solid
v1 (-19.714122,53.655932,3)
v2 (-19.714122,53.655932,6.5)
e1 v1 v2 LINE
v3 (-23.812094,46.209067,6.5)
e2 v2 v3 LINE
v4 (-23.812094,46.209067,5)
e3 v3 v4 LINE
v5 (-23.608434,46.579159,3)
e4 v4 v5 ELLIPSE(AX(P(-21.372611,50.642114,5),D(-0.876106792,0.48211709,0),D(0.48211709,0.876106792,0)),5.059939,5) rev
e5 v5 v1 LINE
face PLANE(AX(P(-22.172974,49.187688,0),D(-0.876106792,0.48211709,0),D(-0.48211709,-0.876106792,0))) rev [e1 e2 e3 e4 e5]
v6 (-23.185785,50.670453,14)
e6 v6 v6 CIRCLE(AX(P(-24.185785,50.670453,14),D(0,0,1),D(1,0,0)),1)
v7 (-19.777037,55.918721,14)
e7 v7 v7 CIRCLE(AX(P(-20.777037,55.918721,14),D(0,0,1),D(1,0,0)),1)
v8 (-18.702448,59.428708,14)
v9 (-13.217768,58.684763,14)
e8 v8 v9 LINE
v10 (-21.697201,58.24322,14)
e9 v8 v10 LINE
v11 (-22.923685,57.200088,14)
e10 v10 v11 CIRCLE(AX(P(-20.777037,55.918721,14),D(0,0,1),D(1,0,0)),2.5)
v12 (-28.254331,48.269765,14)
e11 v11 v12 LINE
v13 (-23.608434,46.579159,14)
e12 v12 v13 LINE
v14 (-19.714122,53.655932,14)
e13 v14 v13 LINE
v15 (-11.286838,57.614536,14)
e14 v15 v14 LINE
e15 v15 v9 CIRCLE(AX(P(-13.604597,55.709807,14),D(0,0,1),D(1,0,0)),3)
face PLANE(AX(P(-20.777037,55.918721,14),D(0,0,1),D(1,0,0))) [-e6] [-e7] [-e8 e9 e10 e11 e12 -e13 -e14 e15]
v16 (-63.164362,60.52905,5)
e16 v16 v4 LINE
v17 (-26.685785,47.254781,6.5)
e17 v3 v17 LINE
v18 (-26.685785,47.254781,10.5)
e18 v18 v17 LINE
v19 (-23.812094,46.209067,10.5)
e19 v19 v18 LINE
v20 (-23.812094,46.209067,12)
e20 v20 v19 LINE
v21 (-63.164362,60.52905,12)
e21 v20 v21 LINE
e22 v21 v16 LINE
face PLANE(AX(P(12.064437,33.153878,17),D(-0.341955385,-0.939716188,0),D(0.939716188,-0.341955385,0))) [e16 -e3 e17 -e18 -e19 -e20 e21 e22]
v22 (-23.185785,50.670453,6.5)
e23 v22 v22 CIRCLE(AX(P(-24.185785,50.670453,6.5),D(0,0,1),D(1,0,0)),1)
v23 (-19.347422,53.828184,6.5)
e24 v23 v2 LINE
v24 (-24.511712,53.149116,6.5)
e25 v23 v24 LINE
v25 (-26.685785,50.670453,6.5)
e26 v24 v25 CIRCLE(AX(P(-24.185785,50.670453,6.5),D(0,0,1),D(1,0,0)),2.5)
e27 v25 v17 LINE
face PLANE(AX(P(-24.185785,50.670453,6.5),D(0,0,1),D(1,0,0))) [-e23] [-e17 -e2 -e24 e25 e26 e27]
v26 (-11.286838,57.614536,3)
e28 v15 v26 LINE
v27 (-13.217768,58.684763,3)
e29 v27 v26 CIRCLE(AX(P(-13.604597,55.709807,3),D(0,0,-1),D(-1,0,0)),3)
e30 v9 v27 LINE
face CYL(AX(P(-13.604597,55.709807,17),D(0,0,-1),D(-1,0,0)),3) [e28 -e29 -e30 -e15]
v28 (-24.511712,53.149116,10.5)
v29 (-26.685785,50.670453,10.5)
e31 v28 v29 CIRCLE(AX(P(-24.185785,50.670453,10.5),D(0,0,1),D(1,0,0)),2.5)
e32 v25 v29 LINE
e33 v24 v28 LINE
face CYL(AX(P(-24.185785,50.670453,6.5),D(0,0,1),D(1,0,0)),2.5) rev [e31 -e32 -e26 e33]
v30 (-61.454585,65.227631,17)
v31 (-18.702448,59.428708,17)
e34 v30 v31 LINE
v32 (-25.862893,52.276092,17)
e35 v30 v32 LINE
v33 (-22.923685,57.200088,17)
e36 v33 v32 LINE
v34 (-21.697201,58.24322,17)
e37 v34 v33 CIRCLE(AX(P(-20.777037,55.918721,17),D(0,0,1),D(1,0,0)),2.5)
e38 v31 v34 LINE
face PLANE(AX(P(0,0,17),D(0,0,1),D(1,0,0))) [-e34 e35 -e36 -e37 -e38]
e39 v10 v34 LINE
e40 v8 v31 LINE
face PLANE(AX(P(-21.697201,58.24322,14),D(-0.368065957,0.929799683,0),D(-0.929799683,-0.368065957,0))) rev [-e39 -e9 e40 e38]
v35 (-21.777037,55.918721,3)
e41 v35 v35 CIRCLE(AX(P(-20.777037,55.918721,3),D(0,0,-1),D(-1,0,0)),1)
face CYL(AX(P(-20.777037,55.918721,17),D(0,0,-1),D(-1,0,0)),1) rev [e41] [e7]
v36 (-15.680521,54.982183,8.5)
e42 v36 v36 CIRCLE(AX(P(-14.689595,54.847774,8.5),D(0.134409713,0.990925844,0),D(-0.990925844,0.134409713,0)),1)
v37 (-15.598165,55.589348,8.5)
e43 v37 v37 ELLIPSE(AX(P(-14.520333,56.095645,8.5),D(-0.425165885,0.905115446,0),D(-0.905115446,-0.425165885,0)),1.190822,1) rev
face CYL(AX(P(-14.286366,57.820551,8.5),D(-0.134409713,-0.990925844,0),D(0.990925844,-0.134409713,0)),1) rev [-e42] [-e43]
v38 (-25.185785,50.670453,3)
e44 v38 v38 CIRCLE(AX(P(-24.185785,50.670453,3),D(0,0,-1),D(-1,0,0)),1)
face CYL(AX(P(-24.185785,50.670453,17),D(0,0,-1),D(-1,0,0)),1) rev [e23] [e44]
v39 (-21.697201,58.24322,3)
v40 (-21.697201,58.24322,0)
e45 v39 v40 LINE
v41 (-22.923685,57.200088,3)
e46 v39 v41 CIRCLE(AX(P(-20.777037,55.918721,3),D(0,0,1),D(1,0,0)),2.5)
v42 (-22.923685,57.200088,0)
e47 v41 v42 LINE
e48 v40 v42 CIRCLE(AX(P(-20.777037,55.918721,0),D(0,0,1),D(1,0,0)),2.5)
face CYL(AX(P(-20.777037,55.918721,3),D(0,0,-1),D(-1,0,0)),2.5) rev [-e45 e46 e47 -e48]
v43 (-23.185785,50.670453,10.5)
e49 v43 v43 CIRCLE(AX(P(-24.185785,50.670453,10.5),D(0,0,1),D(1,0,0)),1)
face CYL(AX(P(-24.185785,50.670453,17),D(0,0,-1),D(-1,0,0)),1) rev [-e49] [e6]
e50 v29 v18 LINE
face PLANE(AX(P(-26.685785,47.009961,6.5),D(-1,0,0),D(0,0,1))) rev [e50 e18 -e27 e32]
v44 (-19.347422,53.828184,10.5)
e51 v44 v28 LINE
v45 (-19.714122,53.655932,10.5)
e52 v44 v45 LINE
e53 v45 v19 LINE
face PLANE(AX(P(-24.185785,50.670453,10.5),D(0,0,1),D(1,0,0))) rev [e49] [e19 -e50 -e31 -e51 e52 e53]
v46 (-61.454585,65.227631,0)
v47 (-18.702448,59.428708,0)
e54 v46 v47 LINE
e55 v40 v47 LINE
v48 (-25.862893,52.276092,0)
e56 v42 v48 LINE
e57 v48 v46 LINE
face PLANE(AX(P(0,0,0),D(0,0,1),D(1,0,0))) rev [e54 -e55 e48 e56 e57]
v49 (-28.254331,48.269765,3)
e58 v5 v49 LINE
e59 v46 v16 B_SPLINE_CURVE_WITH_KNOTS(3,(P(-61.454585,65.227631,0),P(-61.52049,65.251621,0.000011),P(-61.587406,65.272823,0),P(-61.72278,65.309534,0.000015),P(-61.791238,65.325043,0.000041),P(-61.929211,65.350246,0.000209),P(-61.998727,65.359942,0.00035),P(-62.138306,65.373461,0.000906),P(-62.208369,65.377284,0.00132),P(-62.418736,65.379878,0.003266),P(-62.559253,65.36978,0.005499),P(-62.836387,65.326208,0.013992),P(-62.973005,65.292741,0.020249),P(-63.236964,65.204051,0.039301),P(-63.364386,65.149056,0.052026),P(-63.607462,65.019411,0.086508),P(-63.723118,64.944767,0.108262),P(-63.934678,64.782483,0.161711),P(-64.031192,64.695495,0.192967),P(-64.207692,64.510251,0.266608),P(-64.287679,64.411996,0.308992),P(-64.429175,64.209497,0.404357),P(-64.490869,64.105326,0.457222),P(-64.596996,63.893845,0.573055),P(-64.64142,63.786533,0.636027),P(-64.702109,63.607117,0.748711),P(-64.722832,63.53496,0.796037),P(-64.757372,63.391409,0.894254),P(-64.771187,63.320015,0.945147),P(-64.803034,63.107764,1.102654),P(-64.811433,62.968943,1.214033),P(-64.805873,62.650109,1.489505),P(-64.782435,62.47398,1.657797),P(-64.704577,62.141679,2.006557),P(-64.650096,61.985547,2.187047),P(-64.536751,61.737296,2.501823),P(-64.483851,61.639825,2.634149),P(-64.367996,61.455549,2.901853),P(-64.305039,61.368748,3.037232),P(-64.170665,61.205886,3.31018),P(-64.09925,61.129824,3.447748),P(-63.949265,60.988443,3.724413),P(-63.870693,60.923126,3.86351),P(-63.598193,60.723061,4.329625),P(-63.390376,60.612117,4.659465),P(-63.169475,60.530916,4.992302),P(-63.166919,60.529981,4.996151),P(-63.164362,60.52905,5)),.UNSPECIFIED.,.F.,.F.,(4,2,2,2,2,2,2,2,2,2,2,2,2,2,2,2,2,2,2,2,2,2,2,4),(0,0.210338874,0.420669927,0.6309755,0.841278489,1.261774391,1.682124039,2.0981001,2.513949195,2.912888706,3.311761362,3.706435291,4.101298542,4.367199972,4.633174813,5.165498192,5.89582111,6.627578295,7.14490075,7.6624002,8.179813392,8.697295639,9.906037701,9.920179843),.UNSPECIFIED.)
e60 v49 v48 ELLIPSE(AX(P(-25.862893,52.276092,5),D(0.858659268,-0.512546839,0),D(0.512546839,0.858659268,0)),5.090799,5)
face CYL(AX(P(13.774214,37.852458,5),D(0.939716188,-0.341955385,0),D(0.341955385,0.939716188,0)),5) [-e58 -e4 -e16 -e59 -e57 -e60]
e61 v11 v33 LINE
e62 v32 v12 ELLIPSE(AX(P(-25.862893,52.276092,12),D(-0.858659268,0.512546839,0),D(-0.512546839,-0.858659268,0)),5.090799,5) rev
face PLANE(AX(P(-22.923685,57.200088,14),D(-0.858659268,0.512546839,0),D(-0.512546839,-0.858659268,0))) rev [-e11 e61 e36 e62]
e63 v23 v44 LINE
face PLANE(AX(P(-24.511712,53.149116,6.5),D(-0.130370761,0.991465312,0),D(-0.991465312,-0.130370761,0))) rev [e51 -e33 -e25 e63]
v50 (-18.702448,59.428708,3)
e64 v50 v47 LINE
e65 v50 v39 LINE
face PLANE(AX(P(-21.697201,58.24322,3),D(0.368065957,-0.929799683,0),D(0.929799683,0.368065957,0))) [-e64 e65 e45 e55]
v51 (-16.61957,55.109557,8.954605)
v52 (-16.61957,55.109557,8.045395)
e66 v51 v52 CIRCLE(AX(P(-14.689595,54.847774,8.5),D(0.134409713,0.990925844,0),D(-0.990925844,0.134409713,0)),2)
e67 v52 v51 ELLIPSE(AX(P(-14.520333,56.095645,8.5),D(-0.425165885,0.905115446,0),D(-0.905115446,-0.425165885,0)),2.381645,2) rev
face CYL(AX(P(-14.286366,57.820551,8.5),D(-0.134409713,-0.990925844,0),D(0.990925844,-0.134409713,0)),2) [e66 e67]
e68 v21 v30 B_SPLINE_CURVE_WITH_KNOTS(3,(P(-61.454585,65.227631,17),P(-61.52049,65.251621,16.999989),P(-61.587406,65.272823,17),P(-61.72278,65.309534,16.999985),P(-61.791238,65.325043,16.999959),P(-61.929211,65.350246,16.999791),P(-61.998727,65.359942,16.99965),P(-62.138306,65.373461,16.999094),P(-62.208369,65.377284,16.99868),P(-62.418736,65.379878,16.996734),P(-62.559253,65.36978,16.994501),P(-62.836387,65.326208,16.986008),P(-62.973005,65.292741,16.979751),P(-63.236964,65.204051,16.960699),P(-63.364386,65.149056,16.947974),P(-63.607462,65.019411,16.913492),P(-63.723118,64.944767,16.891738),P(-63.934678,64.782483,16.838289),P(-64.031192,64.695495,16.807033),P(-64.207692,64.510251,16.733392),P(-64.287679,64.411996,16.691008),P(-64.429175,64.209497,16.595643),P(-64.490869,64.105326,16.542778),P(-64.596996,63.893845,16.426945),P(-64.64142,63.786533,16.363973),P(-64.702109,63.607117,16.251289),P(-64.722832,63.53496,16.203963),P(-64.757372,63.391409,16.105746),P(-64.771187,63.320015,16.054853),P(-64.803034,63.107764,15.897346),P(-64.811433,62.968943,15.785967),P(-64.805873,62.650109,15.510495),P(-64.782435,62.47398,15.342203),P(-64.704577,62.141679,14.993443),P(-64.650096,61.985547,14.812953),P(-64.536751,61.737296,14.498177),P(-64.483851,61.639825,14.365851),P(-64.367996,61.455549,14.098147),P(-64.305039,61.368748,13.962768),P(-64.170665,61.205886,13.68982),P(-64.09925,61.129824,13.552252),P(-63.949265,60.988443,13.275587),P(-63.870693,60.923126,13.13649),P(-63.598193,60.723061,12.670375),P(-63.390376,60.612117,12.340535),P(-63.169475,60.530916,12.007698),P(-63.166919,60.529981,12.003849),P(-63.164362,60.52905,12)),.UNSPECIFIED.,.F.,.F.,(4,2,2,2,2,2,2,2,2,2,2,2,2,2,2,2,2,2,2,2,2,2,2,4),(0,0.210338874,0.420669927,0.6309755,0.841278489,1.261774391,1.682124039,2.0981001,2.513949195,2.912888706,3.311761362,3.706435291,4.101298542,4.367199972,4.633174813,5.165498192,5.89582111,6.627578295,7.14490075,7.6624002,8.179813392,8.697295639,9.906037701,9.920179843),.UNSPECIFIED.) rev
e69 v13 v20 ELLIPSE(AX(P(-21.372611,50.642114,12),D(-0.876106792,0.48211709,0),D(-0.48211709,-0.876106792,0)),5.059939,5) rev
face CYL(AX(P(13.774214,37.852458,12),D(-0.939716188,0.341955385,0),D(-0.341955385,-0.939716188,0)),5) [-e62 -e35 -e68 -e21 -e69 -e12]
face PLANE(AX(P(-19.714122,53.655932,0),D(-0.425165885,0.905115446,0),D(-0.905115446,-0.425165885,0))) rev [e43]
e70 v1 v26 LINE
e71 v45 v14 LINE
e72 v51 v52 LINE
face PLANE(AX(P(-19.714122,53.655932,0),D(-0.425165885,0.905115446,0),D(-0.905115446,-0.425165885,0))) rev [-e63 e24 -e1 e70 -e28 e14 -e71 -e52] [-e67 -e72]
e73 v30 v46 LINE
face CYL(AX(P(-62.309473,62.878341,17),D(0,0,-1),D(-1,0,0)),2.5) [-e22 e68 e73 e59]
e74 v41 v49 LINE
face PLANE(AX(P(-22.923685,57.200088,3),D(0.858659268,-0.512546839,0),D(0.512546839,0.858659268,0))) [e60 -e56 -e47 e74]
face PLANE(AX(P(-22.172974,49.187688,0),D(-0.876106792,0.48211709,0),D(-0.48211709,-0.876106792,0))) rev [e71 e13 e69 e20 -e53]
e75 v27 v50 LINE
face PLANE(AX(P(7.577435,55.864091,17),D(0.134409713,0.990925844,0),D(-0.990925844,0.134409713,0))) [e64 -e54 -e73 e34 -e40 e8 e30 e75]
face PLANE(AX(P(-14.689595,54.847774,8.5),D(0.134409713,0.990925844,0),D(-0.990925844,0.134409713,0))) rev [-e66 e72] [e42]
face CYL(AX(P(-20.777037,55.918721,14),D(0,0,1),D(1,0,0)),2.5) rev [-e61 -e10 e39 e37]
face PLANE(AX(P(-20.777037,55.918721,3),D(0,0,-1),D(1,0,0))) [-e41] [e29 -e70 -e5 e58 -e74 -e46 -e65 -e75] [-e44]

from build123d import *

# Parameters (mm, degrees)
SKETCH1_R           = 1
BOSS_EXTRUDE1_DEPTH = 17
CUT_EXTRUDE1_DEPTH  = 2
CUT_EXTRUDE2_DEPTH  = 3
CUT_EXTRUDE3_DEPTH  = 94.116031007
SKETCH5_R           = 2
SKETCH5_R_2         = 1
BOSS_EXTRUDE2_DEPTH = 3
FILLET1_START       = -84
FILLET1_DEPTH       = 46.103039735


with BuildPart() as part:
    # Sketch1 → Boss-Extrude1 (new body)
    with BuildSketch(Plane.XY):
        with BuildLine():
            Line((-12.561010035, 47.693103213), (-11.089724337, 53.437595852))
            Line((-11.089724337, 53.437595852), (-10.698403568, 54.965469926))
            ThreePointArc((-10.698403568, 54.965469926), (-11.120792406, 57.392279847), (-13.217767636, 58.684763351))
            Line((-13.217767636, 58.684763351), (-61.454584691, 65.227631075))
            ThreePointArc((-61.454584691, 65.227631075), (-64.658763624, 63.733229066), (-63.164361616, 60.529050133))
            Line((-63.164361616, 60.529050133), (-50.545614142, 55.937186437))
            Line((-50.545614142, 55.937186437), (-41.148452258, 52.517632588))
            Line((-41.148452258, 52.517632588), (-25.57571408, 46.850834736))
            Line((-25.57571408, 46.850834736), (-16.767387766, 43.645553554))
            ThreePointArc((-16.767387766, 43.645553554), (-14.456681284, 43.934299556), (-13.048668569, 45.789087654))
            Line((-13.048668569, 45.789087654), (-12.561010035, 47.693103213))
        make_face()
        with BuildLine():
            ThreePointArc((-23.185784758, 50.67045315), (-23.612180096, 49.851320869), (-24.527740143, 49.730736961))
            ThreePointArc((-24.527740143, 49.730736961), (-24.759389419, 51.48958543), (-23.185784758, 50.67045315))
        make_face(mode=Mode.SUBTRACT)
        with Locations((-20.777036606, 55.918720799)):
            Circle(SKETCH1_R, mode=Mode.SUBTRACT)
    extrude(amount=BOSS_EXTRUDE1_DEPTH)

    # Sketch2 → Cut-Extrude1 (cut, symmetric)
    with BuildSketch(Plane.XY.offset(8.5)):
        with BuildLine():
            Line((-24.51171166, 53.149116429), (-10.698403568, 54.965469926))
            Line((-10.698403568, 54.965469926), (-6.677815913, 55.49414911))
            Line((-6.677815913, 55.49414911), (-11.161264417, 41.454335722))
            Line((-11.161264417, 41.454335722), (-26.685784758, 44.980900868))
            Line((-26.685784758, 44.980900868), (-26.685784758, 47.009961102))
            Line((-26.685784758, 47.009961102), (-26.685784758, 50.67045315))
            ThreePointArc((-26.685784758, 50.67045315), (-26.065255063, 52.318965016), (-24.51171166, 53.149116429))
        make_face()
    extrude(amount=CUT_EXTRUDE1_DEPTH, both=True, mode=Mode.SUBTRACT)

    # Sketch3 → Cut-Extrude2 (cut)
    with BuildSketch(Plane.XY.offset(17)):
        with BuildLine():
            Line((-22.923684774, 57.200087897), (-29.137926811, 46.789494935))
            Line((-29.137926811, 46.789494935), (-12.362720011, 40.045691857))
            Line((-12.362720011, 40.045691857), (-5.826442747, 57.795582407))
            Line((-5.826442747, 57.795582407), (-16.920124342, 60.134250419))
            Line((-16.920124342, 60.134250419), (-21.697201499, 58.243220007))
            ThreePointArc((-21.697201499, 58.243220007), (-22.396717667, 57.823092942), (-22.923684774, 57.200087897))
        make_face()
    cut_extrude2 = extrude(amount=-CUT_EXTRUDE2_DEPTH, mode=Mode.SUBTRACT)

    # Mirror1: Cut-Extrude2 across plane
    add(cut_extrude2.mirror(Plane.XY.offset(8.5)), mode=Mode.SUBTRACT)

    # Sketch4 → Cut-Extrude3 (cut, through all)
    with BuildSketch(Plane.XY.offset(14)):
        Polygon((-19.714121893, 53.655932185), (-10.079835615, 58.181509414), (-11.289444582, 40.128166079), (-24.564448807, 44.84188173), (-23.812093713, 46.209067053), (-22.172973595, 49.187688427), align=None)
    extrude(amount=-CUT_EXTRUDE3_DEPTH, mode=Mode.SUBTRACT)

    # Sketch5 → Boss-Extrude2 (add)
    with BuildSketch(Plane(origin=(7.039796384, 51.900387509, 0), x_dir=(0.9909258444107709, -0.13440971273981925, 0), z_dir=(0.13440971273981922, 0.9909258444107708, 0))):
        with Locations((-21.928372674, -8.5)):
            Circle(SKETCH5_R)
        with Locations(Location((-21.928372674, -8.5, 0), (0, 0, 180))):
            Circle(SKETCH5_R_2, mode=Mode.SUBTRACT)
    extrude(amount=BOSS_EXTRUDE2_DEPTH)

    # Fillet1: read off the stored shape, not the designer's step
    # Fillet1 outline → Fillet1 (cut)
    with BuildSketch(Plane(origin=(0, 0, 0), x_dir=(0.34195538491818894, 0.939716188391715, 0), z_dir=(0.939716188391715, -0.341955384918189, 0)).offset(FILLET1_START)):
        with BuildLine():
            ThreePointArc((35.280734689, 12), (36.74520179, 15.535534913), (40.280737537, 17))
            Line((40.280737537, 17), (35.280734689, 17))
            Line((35.280734689, 17), (35.280734689, 12))
        make_face()
        with BuildLine():
            Line((35.280734689, 5), (35.280734689, 0))
            Line((35.280734689, 0), (40.280737537, 0))
            ThreePointArc((40.280737537, 0), (36.74520179, 1.464465087), (35.280734689, 5))
        make_face()
    extrude(amount=FILLET1_DEPTH, mode=Mode.SUBTRACT)


solid = part.part
